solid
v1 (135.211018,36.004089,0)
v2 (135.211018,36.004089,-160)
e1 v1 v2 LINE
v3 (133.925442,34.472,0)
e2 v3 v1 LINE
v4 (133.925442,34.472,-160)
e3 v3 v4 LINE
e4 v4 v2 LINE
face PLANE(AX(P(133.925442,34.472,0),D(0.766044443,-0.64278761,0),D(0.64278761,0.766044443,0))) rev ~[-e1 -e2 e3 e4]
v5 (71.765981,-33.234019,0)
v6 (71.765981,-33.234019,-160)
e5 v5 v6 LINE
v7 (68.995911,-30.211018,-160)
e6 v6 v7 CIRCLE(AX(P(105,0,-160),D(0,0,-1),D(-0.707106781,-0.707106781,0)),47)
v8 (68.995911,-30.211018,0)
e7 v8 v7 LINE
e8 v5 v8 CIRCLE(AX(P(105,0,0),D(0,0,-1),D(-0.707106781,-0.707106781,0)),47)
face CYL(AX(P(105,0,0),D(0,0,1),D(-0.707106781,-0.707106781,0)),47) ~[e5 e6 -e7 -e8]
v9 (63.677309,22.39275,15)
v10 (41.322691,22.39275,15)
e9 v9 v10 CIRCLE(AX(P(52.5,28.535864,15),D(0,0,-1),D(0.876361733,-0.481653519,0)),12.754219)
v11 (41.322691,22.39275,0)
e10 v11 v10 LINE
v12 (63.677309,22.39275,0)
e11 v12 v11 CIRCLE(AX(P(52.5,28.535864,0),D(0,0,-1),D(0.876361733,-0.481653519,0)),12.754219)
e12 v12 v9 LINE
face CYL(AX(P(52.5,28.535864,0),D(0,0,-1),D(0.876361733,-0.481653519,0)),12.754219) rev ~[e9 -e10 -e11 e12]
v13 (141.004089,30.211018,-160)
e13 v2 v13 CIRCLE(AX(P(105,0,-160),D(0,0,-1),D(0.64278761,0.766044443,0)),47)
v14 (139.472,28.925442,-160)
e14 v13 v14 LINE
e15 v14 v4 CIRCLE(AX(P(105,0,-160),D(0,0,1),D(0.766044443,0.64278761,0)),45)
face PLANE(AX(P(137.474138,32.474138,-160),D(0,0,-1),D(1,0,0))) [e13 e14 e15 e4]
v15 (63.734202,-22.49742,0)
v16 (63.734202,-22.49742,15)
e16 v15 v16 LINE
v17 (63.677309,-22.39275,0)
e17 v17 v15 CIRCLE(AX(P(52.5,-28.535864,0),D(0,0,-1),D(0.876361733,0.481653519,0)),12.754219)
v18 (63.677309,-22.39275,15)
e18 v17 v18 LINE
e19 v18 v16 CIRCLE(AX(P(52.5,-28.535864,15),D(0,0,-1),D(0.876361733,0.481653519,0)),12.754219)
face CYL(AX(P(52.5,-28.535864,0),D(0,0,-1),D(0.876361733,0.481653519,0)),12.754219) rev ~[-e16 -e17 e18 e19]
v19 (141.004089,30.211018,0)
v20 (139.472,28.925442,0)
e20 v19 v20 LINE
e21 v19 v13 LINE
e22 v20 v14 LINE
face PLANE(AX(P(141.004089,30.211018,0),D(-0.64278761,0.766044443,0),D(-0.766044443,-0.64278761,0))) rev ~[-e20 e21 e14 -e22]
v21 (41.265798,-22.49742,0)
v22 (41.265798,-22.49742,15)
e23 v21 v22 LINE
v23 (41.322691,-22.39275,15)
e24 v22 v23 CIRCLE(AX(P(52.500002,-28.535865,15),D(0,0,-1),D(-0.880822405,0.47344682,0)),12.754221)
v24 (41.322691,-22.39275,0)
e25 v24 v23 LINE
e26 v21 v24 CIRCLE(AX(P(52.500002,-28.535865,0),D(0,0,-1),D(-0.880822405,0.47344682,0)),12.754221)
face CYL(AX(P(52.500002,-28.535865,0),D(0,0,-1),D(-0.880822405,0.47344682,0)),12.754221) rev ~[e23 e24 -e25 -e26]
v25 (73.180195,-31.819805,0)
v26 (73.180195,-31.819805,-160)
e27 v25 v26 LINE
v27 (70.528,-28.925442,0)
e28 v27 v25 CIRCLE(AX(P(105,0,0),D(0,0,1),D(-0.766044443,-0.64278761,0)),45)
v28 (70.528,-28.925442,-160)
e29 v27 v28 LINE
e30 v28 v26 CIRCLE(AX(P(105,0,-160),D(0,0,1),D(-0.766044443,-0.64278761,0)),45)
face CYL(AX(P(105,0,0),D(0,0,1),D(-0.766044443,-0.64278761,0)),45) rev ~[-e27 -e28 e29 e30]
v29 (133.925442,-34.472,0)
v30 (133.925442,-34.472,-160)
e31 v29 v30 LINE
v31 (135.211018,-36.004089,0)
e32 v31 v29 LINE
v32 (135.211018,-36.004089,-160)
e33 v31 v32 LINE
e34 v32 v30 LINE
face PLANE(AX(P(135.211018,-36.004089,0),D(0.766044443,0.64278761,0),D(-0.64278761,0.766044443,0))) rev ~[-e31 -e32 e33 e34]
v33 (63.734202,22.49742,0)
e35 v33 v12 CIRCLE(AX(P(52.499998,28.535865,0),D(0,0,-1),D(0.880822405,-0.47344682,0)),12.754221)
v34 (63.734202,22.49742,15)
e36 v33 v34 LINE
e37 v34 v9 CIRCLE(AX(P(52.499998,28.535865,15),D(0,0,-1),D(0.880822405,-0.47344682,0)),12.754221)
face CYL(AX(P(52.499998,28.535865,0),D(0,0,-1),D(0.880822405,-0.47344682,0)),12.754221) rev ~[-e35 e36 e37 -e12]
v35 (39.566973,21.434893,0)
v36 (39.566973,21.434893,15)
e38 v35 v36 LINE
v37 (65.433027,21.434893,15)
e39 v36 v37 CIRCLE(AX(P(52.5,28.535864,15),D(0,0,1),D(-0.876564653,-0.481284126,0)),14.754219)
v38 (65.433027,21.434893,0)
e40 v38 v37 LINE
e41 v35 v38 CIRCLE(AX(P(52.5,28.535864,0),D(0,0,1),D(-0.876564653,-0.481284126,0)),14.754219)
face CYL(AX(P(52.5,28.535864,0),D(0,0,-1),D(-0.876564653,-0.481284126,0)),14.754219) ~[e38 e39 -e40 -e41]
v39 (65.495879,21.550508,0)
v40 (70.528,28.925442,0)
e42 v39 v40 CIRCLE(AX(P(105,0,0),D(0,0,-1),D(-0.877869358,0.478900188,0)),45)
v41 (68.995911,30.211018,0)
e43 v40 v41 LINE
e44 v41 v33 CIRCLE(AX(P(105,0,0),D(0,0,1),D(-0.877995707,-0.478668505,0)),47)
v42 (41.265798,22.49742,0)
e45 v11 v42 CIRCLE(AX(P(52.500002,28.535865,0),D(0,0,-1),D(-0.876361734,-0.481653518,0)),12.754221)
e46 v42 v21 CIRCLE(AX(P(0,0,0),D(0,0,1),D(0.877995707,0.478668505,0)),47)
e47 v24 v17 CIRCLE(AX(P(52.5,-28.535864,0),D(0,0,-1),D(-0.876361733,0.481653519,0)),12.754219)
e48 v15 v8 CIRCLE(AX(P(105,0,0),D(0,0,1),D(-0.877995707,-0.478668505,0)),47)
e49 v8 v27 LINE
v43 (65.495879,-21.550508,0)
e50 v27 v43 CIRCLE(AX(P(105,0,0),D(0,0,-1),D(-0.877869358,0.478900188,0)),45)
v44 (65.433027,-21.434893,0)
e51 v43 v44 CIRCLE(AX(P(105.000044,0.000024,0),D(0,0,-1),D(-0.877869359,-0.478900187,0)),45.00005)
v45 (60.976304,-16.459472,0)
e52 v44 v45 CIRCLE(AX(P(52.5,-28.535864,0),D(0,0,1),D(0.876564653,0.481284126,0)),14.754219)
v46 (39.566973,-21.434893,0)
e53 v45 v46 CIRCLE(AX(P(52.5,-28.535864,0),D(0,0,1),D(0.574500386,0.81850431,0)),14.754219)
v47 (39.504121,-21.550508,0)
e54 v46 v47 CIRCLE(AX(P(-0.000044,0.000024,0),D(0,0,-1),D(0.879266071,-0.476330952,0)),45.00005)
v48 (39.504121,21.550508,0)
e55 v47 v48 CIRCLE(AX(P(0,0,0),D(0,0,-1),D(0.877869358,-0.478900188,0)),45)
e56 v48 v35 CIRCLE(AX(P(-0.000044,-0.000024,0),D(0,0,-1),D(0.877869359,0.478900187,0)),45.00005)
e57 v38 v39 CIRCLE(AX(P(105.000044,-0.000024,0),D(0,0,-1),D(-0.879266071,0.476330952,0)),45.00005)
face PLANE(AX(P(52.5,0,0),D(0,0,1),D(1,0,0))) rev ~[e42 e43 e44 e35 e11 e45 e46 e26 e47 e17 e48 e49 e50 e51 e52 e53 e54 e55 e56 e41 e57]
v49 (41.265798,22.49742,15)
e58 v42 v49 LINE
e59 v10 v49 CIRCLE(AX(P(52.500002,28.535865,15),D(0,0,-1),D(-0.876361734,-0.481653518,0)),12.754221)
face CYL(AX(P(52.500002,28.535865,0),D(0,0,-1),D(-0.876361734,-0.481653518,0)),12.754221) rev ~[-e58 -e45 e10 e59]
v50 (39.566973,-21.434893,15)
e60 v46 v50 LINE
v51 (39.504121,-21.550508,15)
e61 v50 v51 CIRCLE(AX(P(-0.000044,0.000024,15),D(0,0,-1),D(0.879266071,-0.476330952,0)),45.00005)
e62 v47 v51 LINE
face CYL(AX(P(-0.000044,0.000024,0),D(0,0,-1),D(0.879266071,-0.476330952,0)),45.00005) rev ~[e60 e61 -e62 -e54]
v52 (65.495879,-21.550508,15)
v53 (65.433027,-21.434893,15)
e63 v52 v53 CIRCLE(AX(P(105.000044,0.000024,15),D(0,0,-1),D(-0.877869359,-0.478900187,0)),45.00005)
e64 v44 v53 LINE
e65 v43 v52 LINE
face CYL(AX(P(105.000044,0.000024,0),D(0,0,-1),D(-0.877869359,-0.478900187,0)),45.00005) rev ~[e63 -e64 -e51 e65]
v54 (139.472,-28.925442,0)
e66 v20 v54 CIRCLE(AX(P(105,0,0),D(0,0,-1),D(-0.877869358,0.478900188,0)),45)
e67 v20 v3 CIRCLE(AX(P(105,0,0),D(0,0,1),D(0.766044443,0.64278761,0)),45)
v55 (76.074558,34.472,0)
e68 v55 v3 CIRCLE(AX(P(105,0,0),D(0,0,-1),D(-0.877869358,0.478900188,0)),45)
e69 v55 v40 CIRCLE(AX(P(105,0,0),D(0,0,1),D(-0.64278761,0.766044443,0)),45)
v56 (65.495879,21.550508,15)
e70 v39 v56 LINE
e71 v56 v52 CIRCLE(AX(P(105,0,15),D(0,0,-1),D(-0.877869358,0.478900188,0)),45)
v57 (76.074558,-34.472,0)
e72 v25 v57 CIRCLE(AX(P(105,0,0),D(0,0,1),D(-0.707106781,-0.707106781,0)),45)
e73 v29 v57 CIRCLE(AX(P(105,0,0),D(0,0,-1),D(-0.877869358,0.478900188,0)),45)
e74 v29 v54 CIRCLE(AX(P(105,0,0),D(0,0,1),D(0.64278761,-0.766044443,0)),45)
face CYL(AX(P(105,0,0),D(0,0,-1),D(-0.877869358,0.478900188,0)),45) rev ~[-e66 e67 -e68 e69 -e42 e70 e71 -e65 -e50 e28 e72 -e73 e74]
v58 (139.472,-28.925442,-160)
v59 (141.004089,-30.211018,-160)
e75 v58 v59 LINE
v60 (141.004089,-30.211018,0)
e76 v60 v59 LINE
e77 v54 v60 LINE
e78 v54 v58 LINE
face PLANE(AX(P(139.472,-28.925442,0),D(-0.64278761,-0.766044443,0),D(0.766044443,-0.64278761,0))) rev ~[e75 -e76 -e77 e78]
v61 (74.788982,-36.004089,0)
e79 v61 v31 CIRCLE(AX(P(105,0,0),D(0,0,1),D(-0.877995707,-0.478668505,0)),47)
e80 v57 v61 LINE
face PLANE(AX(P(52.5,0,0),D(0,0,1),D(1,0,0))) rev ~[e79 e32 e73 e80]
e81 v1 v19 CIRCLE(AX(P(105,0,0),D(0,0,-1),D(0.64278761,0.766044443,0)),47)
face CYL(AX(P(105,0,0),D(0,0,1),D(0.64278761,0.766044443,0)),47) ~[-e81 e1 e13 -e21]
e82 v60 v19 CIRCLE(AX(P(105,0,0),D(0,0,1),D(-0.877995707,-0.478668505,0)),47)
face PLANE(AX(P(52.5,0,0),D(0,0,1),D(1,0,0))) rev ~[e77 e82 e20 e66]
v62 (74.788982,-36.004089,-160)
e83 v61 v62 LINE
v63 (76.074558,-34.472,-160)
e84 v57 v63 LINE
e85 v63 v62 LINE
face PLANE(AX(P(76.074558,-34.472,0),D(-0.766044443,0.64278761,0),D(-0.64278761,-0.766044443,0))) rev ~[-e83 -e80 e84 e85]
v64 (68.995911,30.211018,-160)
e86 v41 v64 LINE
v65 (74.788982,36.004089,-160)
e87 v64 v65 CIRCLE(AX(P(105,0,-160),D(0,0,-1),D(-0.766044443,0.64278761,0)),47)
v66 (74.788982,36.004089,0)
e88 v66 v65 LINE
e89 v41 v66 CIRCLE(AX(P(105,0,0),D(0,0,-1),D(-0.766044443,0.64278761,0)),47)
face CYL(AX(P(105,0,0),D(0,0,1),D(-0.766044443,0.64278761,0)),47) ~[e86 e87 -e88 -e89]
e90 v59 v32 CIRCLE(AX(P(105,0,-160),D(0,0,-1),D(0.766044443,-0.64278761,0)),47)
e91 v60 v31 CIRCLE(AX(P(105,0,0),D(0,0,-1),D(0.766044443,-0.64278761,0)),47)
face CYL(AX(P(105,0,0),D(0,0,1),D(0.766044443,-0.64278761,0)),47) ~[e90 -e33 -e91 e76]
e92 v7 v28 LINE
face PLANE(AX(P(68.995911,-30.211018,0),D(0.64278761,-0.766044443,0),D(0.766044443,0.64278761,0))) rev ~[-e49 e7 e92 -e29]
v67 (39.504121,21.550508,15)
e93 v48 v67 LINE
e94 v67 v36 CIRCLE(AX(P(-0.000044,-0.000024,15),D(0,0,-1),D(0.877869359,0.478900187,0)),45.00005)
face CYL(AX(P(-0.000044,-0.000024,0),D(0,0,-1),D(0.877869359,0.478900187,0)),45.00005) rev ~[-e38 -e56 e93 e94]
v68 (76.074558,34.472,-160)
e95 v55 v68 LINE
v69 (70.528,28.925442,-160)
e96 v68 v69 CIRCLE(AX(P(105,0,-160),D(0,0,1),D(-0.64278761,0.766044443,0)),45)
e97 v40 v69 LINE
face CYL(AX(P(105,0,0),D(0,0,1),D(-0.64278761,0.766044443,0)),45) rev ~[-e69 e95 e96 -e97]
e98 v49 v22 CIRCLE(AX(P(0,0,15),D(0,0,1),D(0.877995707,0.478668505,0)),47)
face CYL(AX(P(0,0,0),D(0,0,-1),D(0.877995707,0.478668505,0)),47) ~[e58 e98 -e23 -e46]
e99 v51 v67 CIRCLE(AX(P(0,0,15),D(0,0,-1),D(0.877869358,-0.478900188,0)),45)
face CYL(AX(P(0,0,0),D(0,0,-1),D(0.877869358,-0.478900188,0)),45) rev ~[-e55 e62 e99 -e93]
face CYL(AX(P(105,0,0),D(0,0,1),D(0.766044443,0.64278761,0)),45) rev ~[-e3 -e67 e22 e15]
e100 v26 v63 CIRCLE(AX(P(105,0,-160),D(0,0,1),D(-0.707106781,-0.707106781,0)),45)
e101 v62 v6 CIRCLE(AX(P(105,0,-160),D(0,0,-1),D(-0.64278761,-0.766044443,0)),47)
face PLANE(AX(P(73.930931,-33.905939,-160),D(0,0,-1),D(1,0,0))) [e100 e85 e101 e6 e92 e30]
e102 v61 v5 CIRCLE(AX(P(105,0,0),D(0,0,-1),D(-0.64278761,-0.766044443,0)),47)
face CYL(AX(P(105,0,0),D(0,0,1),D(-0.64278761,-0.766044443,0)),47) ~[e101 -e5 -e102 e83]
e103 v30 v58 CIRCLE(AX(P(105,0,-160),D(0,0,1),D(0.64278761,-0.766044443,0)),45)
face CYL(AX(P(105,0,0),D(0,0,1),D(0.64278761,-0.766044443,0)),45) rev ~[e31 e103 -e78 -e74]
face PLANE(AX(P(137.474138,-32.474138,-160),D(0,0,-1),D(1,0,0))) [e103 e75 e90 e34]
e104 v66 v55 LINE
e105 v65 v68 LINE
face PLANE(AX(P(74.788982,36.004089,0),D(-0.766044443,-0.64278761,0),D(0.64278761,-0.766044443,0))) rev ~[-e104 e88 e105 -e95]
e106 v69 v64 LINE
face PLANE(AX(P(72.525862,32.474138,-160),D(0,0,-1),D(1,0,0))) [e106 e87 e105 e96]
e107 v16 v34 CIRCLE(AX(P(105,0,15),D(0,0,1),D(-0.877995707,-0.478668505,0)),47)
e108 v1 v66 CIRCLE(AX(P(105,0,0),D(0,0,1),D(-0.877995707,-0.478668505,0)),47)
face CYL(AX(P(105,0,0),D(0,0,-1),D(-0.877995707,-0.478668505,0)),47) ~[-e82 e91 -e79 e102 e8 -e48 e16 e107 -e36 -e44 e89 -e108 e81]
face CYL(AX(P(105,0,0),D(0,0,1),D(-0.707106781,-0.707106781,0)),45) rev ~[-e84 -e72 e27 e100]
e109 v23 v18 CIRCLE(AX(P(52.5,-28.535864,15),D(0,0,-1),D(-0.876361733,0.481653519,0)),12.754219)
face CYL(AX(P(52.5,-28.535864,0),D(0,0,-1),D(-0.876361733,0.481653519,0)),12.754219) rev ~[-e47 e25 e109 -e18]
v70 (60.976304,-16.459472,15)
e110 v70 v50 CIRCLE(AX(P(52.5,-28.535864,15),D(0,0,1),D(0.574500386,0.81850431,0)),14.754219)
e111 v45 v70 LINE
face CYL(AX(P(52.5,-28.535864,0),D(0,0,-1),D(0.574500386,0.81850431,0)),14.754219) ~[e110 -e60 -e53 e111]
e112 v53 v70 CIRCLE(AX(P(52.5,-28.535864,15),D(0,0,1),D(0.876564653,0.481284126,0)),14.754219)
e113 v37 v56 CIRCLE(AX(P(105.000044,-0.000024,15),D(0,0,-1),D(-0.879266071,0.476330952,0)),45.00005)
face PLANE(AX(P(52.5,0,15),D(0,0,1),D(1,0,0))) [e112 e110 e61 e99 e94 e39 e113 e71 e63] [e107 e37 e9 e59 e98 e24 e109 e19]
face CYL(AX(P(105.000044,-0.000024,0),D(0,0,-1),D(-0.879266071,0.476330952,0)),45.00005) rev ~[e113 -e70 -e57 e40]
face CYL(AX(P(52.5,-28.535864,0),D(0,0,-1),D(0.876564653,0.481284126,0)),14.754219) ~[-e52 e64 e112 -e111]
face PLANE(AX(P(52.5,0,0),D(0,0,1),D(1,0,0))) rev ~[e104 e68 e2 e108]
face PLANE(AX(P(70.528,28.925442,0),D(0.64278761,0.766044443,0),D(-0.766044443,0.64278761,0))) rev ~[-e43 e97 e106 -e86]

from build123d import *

# Parameters (mm, degrees)
F1_DEPTH = 15
F3_DEPTH = 160


# Not quite as in the source:
# - after a boolean that leaves OpenCascade's solid faulty, fix() repairs it


with BuildPart() as f1:
    # F0 (on Top) → F1 (new body)
    with BuildSketch(Plane.XY):
        with BuildLine():
            ThreePointArc((41.3226906327, -22.3927496943), (52.5, -15.7816452182), (63.6773093673, -22.3927496943))
            ThreePointArc((63.6773093673, -22.3927496943), (63.7058777697, -22.4450182881), (63.7342017495, -22.4974197353))
            ThreePointArc((63.7342017494, -22.4974197352), (152, 0), (63.7342017494, 22.4974197352))
            ThreePointArc((63.7342017494, 22.4974197352), (63.7058777696, 22.445018288), (63.6773093673, 22.3927496943))
            ThreePointArc((63.6773093673, 22.3927496943), (52.5, 15.7816452182), (41.3226906327, 22.3927496943))
            ThreePointArc((41.3226906327, 22.3927496943), (41.2941222304, 22.445018288), (41.2657982506, 22.4974197352))
            ThreePointArc((41.2657982506, 22.4974197352), (-47, 0), (41.2657982506, -22.4974197352))
            ThreePointArc((41.2657982506, -22.4974197352), (41.2941222304, -22.445018288), (41.3226906327, -22.3927496943))
        make_face()
        with BuildLine():
            ThreePointArc((39.5041211148, 21.5505084615), (39.5355894457, 21.4927235868), (39.5669732516, 21.4348927618))
            ThreePointArc((39.5669732516, 21.4348927618), (52.5, 13.7816452182), (65.4330267484, 21.4348927618))
            ThreePointArc((65.4330267484, 21.4348927618), (65.4644105543, 21.4927235868), (65.4958788852, 21.5505084615))
            ThreePointArc((65.4958788852, 21.5505084615), (150, 0), (65.4958788852, -21.5505084615))
            ThreePointArc((65.4958788852, -21.5505084615), (65.4644105543, -21.4927235868), (65.4330267484, -21.4348927618))
            ThreePointArc((65.4330267484, -21.4348927618), (63.4899302841, -18.6916573179), (60.976304449, -16.4594723499))
            ThreePointArc((60.976304449, -16.4594723499), (49.1601952928, -14.1646192224), (39.5669732516, -21.4348927618))
            ThreePointArc((39.5669732516, -21.4348927618), (39.5355894457, -21.4927235868), (39.5041211148, -21.5505084615))
            ThreePointArc((39.5041211148, -21.5505084615), (-45, 0), (39.5041211148, 21.5505084615))
        make_face(mode=Mode.SUBTRACT)
    extrude(amount=F1_DEPTH)

    # F2 (on face) → F3 (join)
    with BuildSketch(Plane(origin=(0, 0, 0), x_dir=(1, 0, 0), z_dir=(0, 0, -1))):
        with BuildLine():
            ThreePointArc((74.7889823447, 36.0040888266), (73.2472602421, 34.6520348301), (71.7659812842, 33.2340187158))
            Line((71.7659812842, 33.2340187158), (73.1801948457, 31.8198051543))
            ThreePointArc((73.1801948466, 31.8198051534), (74.5984406573, 33.1774801565), (76.0745575641, 34.4719999404))
            Line((76.0745575641, 34.4719999404), (74.7889823447, 36.0040888266))
        make_face()
        with BuildLine():
            ThreePointArc((71.7659812842, 33.2340187158), (70.3479651699, 31.7527397579), (68.9959111734, 30.2110176553))
            Line((68.9959111734, 30.2110176553), (70.5280000596, 28.9254424359))
            ThreePointArc((70.5280000596, 28.9254424359), (71.8225198435, 30.4015593427), (73.1801948466, 31.8198051534))
            Line((73.1801948457, 31.8198051543), (71.7659812842, 33.2340187158))
        make_face()
        with BuildLine():
            ThreePointArc((141.0040888266, 30.2110176553), (138.2340187158, 33.2340187158), (135.2110176553, 36.0040888266))
            Line((135.2110176553, 36.0040888266), (133.9254424359, 34.4719999404))
            ThreePointArc((133.9254424359, 34.4719999404), (136.8198051534, 31.8198051534), (139.4719999404, 28.9254424359))
            Line((139.4719999404, 28.9254424359), (141.0040888266, 30.2110176553))
        make_face()
        with BuildLine():
            ThreePointArc((135.2110176553, -36.0040888266), (138.2340187158, -33.2340187158), (141.0040888266, -30.2110176553))
            Line((141.0040888266, -30.2110176553), (139.4719999404, -28.9254424359))
            ThreePointArc((139.4719999404, -28.9254424359), (136.8198051534, -31.8198051534), (133.9254424359, -34.4719999404))
            Line((133.9254424359, -34.4719999404), (135.2110176553, -36.0040888266))
        make_face()
        with BuildLine():
            Line((70.5280000596, -28.9254424359), (68.9959111734, -30.2110176553))
            ThreePointArc((68.9959111734, -30.2110176553), (71.7659812842, -33.2340187158), (74.7889823447, -36.0040888266))
            Line((74.7889823447, -36.0040888266), (76.0745575641, -34.4719999404))
            ThreePointArc((76.0745575641, -34.4719999404), (73.1801948466, -31.8198051534), (70.5280000596, -28.9254424359))
        make_face()
    extrude(amount=F3_DEPTH)

    add(f1.part.fix(), mode=Mode.REPLACE)


solid = f1.part
